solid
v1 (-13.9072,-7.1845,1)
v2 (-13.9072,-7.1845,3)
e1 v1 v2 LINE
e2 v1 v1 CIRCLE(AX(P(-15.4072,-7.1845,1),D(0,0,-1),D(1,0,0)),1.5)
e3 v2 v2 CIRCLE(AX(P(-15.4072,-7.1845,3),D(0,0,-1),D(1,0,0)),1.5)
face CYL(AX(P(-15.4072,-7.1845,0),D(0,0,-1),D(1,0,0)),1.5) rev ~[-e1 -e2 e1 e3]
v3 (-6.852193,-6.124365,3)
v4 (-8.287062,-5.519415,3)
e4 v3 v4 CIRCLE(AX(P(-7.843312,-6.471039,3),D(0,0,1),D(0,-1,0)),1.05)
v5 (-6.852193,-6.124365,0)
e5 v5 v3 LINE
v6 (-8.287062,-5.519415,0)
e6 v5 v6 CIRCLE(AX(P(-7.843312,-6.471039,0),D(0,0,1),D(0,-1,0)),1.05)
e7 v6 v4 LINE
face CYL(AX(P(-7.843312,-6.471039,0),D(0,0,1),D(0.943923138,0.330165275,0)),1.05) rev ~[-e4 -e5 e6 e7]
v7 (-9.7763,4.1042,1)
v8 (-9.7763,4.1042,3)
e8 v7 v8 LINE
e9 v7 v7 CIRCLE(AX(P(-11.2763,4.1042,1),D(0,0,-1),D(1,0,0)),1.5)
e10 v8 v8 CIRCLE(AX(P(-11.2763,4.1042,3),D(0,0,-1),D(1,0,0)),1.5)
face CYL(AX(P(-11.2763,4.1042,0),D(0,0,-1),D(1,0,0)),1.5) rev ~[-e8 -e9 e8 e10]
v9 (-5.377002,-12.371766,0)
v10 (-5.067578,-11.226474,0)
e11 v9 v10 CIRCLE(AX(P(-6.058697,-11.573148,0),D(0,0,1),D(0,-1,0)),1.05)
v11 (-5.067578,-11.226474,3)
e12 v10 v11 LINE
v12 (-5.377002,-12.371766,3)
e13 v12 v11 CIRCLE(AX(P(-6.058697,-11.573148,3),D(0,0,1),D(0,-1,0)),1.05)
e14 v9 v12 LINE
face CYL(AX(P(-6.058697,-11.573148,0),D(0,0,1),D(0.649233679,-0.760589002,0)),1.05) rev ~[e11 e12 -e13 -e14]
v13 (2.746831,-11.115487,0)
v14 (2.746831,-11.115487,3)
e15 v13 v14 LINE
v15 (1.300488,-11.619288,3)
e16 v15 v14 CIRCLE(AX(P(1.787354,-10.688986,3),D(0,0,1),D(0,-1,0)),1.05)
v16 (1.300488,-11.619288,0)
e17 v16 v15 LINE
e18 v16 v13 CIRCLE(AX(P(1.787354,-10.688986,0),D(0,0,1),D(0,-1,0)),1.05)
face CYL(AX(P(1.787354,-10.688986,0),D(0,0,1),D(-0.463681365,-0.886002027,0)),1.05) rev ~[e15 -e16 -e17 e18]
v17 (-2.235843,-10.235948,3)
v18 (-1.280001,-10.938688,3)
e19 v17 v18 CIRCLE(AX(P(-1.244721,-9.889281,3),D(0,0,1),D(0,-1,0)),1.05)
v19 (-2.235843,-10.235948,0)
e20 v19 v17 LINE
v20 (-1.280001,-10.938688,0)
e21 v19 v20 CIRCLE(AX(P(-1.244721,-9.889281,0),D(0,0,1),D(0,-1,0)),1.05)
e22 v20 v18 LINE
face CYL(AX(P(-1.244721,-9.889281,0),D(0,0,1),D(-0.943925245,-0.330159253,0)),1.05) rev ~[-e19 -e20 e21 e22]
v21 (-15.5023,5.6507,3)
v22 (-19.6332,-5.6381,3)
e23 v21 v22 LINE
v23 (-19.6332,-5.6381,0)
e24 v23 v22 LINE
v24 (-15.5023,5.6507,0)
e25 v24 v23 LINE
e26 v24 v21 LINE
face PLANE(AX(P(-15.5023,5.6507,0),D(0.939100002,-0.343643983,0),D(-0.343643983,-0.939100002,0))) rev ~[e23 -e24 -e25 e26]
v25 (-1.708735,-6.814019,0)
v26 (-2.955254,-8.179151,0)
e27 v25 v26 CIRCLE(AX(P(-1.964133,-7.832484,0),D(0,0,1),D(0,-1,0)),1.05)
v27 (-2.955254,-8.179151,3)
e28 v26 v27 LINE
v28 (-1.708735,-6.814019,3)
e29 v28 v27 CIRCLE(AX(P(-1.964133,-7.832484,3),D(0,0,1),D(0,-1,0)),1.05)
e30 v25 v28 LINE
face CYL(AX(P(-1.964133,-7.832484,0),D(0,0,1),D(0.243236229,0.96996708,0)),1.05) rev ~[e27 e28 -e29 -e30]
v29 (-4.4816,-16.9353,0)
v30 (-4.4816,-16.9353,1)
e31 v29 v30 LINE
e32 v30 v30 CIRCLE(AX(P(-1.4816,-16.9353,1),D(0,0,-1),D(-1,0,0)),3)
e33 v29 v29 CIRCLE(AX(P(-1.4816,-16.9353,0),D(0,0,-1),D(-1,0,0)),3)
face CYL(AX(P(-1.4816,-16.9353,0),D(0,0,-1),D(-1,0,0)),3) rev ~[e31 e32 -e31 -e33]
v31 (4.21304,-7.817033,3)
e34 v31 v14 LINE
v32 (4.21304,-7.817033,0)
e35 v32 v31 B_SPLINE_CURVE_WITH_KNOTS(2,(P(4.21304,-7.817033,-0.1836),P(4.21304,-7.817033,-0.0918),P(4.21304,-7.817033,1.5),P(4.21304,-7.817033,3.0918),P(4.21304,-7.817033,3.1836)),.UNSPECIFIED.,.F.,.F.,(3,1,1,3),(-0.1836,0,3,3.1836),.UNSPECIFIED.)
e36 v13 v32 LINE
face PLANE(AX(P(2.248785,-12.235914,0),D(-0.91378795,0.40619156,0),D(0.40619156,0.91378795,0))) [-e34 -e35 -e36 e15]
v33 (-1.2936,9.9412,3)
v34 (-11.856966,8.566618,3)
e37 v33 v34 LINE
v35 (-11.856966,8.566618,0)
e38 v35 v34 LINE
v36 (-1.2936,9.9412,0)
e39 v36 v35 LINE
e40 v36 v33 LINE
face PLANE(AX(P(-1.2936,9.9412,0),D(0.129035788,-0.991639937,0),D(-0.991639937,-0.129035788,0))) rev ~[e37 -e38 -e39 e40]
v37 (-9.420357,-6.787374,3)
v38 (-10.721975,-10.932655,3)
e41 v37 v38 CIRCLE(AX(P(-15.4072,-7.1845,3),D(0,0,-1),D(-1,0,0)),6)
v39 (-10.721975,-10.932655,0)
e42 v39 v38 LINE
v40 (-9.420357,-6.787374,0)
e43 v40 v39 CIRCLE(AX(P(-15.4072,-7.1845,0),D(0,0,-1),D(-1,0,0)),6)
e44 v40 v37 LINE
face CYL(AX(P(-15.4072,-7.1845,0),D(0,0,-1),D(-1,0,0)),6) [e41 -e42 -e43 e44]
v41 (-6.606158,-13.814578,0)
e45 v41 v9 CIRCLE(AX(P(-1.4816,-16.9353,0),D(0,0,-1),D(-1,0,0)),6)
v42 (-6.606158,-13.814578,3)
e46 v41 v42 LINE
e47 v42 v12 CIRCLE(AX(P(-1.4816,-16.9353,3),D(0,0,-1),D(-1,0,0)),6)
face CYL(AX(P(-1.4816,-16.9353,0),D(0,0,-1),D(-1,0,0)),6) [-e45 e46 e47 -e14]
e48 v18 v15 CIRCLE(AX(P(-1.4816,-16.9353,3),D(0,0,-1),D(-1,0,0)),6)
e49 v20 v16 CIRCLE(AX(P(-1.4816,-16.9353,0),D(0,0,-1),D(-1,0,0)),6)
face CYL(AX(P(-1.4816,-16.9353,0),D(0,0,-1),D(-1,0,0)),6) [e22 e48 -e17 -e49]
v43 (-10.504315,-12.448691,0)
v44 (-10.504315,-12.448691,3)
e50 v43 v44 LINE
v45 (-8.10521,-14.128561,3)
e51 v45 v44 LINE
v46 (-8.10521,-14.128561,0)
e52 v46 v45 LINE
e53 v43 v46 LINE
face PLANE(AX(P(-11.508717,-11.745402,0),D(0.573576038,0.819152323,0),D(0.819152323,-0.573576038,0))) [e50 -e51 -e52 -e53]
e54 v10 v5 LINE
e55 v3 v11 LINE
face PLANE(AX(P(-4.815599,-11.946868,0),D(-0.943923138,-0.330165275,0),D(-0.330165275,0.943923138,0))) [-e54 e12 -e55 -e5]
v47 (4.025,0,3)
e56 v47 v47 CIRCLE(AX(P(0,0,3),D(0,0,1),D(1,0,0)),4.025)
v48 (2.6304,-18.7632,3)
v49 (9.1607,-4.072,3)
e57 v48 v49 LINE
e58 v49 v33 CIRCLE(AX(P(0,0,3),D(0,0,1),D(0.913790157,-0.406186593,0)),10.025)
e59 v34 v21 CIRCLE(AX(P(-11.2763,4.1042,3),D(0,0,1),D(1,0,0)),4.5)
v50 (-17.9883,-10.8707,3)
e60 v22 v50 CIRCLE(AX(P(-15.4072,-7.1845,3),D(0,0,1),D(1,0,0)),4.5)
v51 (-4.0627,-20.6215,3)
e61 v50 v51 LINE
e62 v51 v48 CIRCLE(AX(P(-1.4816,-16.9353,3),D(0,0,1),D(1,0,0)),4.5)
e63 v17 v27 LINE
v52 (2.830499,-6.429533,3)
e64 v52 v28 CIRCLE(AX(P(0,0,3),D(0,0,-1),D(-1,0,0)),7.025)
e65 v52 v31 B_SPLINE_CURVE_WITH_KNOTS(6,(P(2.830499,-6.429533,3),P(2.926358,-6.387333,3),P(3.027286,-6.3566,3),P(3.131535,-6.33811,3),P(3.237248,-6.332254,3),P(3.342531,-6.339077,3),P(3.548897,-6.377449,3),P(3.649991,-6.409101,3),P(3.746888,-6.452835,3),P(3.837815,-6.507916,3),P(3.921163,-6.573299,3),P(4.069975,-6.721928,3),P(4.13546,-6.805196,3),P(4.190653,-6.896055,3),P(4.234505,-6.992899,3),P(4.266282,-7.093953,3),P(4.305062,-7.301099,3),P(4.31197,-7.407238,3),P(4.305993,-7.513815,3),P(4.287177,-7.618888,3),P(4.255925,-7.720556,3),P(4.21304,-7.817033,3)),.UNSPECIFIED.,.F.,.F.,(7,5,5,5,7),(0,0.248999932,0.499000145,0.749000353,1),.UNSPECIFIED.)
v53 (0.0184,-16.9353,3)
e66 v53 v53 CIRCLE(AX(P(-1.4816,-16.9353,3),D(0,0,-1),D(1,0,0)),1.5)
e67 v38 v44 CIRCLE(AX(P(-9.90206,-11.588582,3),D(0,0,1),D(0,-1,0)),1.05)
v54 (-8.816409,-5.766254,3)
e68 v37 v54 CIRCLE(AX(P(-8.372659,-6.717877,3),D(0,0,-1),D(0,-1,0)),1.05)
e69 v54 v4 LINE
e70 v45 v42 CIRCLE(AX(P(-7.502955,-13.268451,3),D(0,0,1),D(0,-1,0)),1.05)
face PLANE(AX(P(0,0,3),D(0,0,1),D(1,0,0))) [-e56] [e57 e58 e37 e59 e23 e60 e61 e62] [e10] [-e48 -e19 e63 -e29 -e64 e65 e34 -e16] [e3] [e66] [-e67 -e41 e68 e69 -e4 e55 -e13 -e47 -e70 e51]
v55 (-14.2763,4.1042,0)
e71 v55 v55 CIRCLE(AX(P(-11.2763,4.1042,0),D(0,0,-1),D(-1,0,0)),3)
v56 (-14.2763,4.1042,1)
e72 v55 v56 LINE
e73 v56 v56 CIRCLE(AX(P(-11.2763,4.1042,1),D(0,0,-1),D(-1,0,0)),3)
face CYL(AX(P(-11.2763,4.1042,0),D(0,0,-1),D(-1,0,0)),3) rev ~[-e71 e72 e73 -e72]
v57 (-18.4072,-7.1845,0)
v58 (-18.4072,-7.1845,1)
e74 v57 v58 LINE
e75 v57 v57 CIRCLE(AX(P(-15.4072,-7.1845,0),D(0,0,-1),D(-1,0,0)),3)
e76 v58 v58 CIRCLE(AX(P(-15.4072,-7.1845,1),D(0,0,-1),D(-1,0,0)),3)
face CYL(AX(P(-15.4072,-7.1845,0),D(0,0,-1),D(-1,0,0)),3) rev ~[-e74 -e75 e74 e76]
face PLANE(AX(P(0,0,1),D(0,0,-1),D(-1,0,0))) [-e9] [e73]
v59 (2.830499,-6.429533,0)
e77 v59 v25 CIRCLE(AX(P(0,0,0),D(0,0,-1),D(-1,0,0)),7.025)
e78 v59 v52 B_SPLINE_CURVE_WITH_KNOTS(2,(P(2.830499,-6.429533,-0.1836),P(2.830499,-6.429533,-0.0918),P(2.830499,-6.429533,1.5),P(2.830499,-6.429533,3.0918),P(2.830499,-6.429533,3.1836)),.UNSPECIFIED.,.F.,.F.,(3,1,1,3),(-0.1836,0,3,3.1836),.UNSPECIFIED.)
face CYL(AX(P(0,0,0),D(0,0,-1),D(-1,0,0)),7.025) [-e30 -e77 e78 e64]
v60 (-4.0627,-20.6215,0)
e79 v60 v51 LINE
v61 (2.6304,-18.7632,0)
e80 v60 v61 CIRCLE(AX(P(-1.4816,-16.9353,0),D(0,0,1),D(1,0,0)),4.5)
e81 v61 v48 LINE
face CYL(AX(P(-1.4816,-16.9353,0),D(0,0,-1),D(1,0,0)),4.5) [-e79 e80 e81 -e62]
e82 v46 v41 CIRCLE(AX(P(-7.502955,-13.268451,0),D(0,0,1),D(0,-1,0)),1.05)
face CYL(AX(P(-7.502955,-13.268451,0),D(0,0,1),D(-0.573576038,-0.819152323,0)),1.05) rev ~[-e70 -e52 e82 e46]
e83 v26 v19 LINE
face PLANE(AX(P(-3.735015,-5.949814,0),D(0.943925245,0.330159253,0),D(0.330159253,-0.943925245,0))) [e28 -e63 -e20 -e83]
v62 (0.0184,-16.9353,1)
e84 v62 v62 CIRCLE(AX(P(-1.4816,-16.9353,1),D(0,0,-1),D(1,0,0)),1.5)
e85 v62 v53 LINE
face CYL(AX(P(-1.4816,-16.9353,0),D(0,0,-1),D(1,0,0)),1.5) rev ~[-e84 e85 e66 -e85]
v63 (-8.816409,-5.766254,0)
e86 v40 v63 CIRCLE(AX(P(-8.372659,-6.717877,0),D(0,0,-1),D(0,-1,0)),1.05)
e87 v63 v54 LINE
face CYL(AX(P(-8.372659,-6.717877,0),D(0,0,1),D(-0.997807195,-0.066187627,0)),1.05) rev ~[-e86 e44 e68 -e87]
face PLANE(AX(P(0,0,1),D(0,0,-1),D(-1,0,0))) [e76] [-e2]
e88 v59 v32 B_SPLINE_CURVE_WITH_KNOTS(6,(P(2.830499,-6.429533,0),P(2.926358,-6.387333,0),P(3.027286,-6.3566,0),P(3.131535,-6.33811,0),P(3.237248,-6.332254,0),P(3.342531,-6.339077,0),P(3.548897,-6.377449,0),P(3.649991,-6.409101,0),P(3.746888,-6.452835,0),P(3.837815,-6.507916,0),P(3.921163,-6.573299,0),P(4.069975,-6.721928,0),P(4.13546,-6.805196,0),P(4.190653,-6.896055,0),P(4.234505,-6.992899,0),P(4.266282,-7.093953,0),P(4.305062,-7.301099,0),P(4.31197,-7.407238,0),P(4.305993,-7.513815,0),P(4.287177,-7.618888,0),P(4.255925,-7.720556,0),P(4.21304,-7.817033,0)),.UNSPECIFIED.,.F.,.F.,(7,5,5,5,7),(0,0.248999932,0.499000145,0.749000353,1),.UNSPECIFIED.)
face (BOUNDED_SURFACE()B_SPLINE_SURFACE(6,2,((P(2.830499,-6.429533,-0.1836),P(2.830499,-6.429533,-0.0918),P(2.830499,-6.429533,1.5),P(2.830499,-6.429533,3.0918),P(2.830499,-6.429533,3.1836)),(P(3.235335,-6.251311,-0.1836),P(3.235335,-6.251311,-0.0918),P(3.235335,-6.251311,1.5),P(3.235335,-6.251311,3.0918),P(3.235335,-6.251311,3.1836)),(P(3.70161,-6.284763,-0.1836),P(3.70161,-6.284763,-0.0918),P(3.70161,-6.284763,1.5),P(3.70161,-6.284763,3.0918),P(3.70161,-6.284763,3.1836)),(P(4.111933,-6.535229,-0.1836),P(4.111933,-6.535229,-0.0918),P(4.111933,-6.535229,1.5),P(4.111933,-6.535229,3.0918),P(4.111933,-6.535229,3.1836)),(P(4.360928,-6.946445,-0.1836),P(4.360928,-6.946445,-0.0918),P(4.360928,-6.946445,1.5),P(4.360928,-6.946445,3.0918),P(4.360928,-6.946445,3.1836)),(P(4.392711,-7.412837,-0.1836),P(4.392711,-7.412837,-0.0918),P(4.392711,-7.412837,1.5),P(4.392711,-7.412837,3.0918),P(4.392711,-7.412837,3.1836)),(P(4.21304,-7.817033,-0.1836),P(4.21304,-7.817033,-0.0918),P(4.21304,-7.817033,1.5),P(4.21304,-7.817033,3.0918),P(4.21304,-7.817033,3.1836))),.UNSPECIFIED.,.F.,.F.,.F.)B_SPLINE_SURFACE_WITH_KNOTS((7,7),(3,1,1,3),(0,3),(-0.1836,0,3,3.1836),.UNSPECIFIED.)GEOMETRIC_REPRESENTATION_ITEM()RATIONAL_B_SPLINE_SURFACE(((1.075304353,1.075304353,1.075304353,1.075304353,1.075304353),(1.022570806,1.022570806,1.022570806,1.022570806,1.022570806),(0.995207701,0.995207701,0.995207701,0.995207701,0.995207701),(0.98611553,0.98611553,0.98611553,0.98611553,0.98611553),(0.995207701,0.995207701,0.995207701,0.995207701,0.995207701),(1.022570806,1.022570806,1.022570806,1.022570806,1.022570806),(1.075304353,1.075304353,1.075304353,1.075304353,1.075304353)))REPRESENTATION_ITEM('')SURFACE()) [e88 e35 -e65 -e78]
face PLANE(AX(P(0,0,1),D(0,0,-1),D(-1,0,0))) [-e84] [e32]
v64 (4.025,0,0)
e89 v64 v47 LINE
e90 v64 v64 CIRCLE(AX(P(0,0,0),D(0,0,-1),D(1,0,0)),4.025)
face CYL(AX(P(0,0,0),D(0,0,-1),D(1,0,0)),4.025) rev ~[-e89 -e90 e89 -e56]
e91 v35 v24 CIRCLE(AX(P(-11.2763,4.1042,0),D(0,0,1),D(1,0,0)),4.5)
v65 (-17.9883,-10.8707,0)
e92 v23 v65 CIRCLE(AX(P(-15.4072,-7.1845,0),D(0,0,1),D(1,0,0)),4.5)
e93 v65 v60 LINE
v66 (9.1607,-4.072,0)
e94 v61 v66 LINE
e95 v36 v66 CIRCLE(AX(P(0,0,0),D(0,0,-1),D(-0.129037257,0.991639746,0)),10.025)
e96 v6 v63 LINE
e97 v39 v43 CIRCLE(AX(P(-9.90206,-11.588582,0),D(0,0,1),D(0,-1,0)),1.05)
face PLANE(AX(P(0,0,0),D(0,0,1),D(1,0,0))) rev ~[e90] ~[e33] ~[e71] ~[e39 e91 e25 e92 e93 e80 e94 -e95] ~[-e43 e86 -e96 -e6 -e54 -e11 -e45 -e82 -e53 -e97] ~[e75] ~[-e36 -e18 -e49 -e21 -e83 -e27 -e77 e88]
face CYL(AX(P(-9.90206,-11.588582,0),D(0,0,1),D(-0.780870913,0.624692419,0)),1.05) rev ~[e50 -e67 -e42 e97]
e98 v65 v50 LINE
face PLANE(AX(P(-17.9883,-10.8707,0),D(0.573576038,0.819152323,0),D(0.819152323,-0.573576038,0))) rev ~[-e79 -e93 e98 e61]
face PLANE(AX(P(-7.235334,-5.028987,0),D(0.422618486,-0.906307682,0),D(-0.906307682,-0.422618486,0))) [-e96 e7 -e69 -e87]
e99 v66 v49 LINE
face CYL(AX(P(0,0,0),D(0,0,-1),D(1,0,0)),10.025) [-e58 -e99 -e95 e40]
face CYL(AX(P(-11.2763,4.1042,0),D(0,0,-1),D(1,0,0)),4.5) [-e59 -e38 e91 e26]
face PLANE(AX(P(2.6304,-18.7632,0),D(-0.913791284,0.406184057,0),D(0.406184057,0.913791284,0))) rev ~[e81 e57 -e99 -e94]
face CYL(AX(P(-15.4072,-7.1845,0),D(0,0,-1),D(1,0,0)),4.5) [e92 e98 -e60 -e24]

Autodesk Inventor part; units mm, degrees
ref_plane "YZ Plane" through (0, 0, 0) normal (1, 0, 0) x (0, 1, 0)
ref_plane "XZ Plane" through (0, 0, 0) normal (0, 1, 0) x (-1, 0, 0)
ref_plane "XY Plane" through (0, 0, 0) normal (0, 0, 1) x (1, 0, 0)
sketch "スケッチ1" plane through (0, 0, 0) normal (0, 0, 1) x (1, 0, 0)
  circle A0 centre (0, 0) radius 4.025
  line L0 (0, 0) -> (0, -4.025)
  line L1 (0, 0) -> (-1.4816, -16.9353)
  circle A1 centre (-1.4816, -16.9353) radius 1.5
  line L2 (0, 0) -> (-15.4072, -7.1845)
  circle A2 centre (-15.4072, -7.1845) radius 1.5
  line L3 (0, 0) -> (-11.2763, 4.1042)
  circle A3 centre (-11.2763, 4.1042) radius 1.5
  circle A4 centre (0, 0) radius 7.025
  circle A5 centre (0, 0) radius 10.025
  circle A6 centre (-11.2763, 4.1042) radius 4.5
  circle A7 centre (-15.4072, -7.1845) radius 4.5
  circle A8 centre (-1.4816, -16.9353) radius 4.5
  line L4 (-15.5023, 5.6507) -> (-19.6332, -5.6381)
  line L5 (-17.9883, -10.8707) -> (-4.0627, -20.6215)
  line L6 (2.6304, -18.7632) -> (9.1607, -4.072)
  line L7 (-1.2936, 9.9412) -> (-12.3185, 8.5066)
  point P0 (-11.857, 8.5666)
  dimension "d0" = 8.05
  dimension "d1" = 5
  dimension "d2" = 17
  dimension "d3" = 3
  dimension "d4" = 17
  dimension "d5" = 3
  dimension "d6" = 60
  dimension "d7" = 12
  dimension "d8" = 3
  dimension "d9" = 45
  dimension "d12" = 3
  dimension "d18" = 3
  dimension "d19" = 3
  dimension "d20" = 3
  dimension "d21" = 3
extrude "押し出し1" add sketch "スケッチ1" along normal blind 3 contours A0 L3 A4 L1 | L1 A4 L2 A0 | A0 L2 A4 L3 | A4 L3 A6 A5 L1 | L1 A5 L2 A4 | A4 L2 A5 A6 L3 | A5 L6 A8 L1 | L1 A8 L5 A7 L2 A5 | A6 A5 L3 | L3 A5 A6 | L2 A7 L4 A6 A5 | A8 | A5 A6 | A7 | A6 L7 A5
sketch "スケッチ2" plane through (0, 0, 0) normal (0, 0, -1) x (-1, 0, 0)
  circle A0 centre (11.2763, 4.1042) radius 1.5 projected
  circle A1 centre (15.4072, -7.1845) radius 1.5 projected
  circle A2 centre (1.4816, -16.9353) radius 1.5 projected
  circle A3 centre (11.2763, 4.1042) radius 3
  circle A4 centre (15.4072, -7.1845) radius 3
  circle A5 centre (1.4816, -16.9353) radius 3
  point P0 (0, 0)
  dimension "d13" = 6
  dimension "d14" = 6
  dimension "d15" = 6
extrude "押し出し2" cut sketch "スケッチ2" against normal blind 1
sketch "スケッチ3" plane through (0, 0, 0) normal (0, 0, -1) x (-1, 0, 0)
  circle A0 centre (11.2763, 4.1042) radius 3 projected
  circle A1 centre (15.4072, -7.1845) radius 3 projected
  circle A2 centre (1.4816, -16.9353) radius 3 projected
  circle A3 centre (0, 0) radius 4.025 projected
  arc A4 (17.9883, -10.8707) -> (19.6332, -5.6381) centre (15.4072, -7.1845) ccw projected
  line L0 (15.5023, 5.6507) -> (19.6332, -5.6381) projected
  arc A5 (15.5023, 5.6507) -> (11.857, 8.5666) centre (11.2763, 4.1042) ccw projected
  line L1 (1.2936, 9.9412) -> (11.857, 8.5666) projected
  arc A6 (1.2936, 9.9412) -> (-9.1607, -4.072) centre (0, 0) ccw projected
  line L2 (-2.6304, -18.7632) -> (-9.1607, -4.072) projected
  arc A7 (-2.6304, -18.7632) -> (4.0627, -20.6215) centre (1.4816, -16.9353) ccw projected
  line L3 (17.9883, -10.8707) -> (4.0627, -20.6215) projected
  arc A8 (0.9065, 6.9663) -> (-6.4194, -2.8535) centre (0, 0) ccw
  line L4 (0.9065, 6.9663) -> (11.4699, 5.5917)
  arc A9 (12.685, 4.6197) -> (11.4699, 5.5917) centre (11.2763, 4.1042) ccw
  line L5 (12.685, 4.6197) -> (16.8159, -6.669)
  arc A10 (16.2676, -8.4132) -> (16.8159, -6.669) centre (15.4072, -7.1845) ccw
  line L6 (16.2676, -8.4132) -> (2.342, -18.164)
  arc A11 (0.111, -17.5446) -> (2.342, -18.164) centre (1.4816, -16.9353) ccw
  line L7 (0.111, -17.5446) -> (-6.4194, -2.8535)
  circle A12 centre (0, 0) radius 7.025
  circle A13 centre (1.4816, -16.9353) radius 6
  circle A14 centre (15.4072, -7.1845) radius 6
  circle A15 centre (11.2763, 4.1042) radius 6
  line L8 (0, 0) -> (15.4072, -7.1845) construction
  line L9 (-0.6339, -1.3595) -> (14.7733, -8.544)
  line L10 (16.0412, -5.825) -> (0.6339, 1.3595)
  arc A16 (0.6339, 1.3595) -> (-0.6339, -1.3595) centre (0, 0) ccw
  arc A17 (14.7733, -8.544) -> (16.0412, -5.825) centre (15.4072, -7.1845) ccw
  line L11 (1.4816, -16.9353) -> (6.3668, -2.9689) construction
  line L12 (2.8975, -17.4306) -> (7.7827, -3.4641)
  line L13 (4.9509, -2.4736) -> (0.0658, -16.4401)
  arc A18 (0.0658, -16.4401) -> (2.8975, -17.4306) centre (1.4816, -16.9353) ccw
  arc A19 (7.7827, -3.4641) -> (4.9509, -2.4736) centre (6.3668, -2.9689) ccw
  point P0 (7.7036, -3.5923)
  point P1 (3.9242, -9.9521)
  point P2 (7.2354, -5.029)
  point P3 (4.8156, -11.9469)
  point P4 (7.1009, -14.8319)
  point P5 (11.5088, -11.7454)
  point P6 (9.5081, -6.0888)
  point P7 (1.9838, -10.9564)
  point P8 (3.735, -5.9498)
  point P9 (-6.4194, -2.8535)
  point P10 (-2.2488, -12.236)
  dimension "d22" = 3
  dimension "d23" = 3
  dimension "d24" = 3
  dimension "d25" = 3
  dimension "d26" = 3
  dimension "d27" = 3
  dimension "d28" = 3
extrude "押し出し3" cut sketch "スケッチ3" against normal blind 10 contours A12 L13 A13 L7 | A14 L6 A13 L12 L9
fillet "フィレット1" radius 1.05 9 edges at (-1.9838, -10.9564, 1.5) (6.4194, -2.8535, 1.5) (2.2488, -12.236, 1.5) (-3.735, -5.9498, 1.5) (-9.5081, -6.0888, 1.5) (-7.2354, -5.029, 1.5) (-4.8156, -11.9469, 1.5) (-7.1009, -14.8319, 1.5) (-11.5088, -11.7454, 1.5)
properties part number "アーム揺動節抑え" material "アルミニウム 2014-T4"
